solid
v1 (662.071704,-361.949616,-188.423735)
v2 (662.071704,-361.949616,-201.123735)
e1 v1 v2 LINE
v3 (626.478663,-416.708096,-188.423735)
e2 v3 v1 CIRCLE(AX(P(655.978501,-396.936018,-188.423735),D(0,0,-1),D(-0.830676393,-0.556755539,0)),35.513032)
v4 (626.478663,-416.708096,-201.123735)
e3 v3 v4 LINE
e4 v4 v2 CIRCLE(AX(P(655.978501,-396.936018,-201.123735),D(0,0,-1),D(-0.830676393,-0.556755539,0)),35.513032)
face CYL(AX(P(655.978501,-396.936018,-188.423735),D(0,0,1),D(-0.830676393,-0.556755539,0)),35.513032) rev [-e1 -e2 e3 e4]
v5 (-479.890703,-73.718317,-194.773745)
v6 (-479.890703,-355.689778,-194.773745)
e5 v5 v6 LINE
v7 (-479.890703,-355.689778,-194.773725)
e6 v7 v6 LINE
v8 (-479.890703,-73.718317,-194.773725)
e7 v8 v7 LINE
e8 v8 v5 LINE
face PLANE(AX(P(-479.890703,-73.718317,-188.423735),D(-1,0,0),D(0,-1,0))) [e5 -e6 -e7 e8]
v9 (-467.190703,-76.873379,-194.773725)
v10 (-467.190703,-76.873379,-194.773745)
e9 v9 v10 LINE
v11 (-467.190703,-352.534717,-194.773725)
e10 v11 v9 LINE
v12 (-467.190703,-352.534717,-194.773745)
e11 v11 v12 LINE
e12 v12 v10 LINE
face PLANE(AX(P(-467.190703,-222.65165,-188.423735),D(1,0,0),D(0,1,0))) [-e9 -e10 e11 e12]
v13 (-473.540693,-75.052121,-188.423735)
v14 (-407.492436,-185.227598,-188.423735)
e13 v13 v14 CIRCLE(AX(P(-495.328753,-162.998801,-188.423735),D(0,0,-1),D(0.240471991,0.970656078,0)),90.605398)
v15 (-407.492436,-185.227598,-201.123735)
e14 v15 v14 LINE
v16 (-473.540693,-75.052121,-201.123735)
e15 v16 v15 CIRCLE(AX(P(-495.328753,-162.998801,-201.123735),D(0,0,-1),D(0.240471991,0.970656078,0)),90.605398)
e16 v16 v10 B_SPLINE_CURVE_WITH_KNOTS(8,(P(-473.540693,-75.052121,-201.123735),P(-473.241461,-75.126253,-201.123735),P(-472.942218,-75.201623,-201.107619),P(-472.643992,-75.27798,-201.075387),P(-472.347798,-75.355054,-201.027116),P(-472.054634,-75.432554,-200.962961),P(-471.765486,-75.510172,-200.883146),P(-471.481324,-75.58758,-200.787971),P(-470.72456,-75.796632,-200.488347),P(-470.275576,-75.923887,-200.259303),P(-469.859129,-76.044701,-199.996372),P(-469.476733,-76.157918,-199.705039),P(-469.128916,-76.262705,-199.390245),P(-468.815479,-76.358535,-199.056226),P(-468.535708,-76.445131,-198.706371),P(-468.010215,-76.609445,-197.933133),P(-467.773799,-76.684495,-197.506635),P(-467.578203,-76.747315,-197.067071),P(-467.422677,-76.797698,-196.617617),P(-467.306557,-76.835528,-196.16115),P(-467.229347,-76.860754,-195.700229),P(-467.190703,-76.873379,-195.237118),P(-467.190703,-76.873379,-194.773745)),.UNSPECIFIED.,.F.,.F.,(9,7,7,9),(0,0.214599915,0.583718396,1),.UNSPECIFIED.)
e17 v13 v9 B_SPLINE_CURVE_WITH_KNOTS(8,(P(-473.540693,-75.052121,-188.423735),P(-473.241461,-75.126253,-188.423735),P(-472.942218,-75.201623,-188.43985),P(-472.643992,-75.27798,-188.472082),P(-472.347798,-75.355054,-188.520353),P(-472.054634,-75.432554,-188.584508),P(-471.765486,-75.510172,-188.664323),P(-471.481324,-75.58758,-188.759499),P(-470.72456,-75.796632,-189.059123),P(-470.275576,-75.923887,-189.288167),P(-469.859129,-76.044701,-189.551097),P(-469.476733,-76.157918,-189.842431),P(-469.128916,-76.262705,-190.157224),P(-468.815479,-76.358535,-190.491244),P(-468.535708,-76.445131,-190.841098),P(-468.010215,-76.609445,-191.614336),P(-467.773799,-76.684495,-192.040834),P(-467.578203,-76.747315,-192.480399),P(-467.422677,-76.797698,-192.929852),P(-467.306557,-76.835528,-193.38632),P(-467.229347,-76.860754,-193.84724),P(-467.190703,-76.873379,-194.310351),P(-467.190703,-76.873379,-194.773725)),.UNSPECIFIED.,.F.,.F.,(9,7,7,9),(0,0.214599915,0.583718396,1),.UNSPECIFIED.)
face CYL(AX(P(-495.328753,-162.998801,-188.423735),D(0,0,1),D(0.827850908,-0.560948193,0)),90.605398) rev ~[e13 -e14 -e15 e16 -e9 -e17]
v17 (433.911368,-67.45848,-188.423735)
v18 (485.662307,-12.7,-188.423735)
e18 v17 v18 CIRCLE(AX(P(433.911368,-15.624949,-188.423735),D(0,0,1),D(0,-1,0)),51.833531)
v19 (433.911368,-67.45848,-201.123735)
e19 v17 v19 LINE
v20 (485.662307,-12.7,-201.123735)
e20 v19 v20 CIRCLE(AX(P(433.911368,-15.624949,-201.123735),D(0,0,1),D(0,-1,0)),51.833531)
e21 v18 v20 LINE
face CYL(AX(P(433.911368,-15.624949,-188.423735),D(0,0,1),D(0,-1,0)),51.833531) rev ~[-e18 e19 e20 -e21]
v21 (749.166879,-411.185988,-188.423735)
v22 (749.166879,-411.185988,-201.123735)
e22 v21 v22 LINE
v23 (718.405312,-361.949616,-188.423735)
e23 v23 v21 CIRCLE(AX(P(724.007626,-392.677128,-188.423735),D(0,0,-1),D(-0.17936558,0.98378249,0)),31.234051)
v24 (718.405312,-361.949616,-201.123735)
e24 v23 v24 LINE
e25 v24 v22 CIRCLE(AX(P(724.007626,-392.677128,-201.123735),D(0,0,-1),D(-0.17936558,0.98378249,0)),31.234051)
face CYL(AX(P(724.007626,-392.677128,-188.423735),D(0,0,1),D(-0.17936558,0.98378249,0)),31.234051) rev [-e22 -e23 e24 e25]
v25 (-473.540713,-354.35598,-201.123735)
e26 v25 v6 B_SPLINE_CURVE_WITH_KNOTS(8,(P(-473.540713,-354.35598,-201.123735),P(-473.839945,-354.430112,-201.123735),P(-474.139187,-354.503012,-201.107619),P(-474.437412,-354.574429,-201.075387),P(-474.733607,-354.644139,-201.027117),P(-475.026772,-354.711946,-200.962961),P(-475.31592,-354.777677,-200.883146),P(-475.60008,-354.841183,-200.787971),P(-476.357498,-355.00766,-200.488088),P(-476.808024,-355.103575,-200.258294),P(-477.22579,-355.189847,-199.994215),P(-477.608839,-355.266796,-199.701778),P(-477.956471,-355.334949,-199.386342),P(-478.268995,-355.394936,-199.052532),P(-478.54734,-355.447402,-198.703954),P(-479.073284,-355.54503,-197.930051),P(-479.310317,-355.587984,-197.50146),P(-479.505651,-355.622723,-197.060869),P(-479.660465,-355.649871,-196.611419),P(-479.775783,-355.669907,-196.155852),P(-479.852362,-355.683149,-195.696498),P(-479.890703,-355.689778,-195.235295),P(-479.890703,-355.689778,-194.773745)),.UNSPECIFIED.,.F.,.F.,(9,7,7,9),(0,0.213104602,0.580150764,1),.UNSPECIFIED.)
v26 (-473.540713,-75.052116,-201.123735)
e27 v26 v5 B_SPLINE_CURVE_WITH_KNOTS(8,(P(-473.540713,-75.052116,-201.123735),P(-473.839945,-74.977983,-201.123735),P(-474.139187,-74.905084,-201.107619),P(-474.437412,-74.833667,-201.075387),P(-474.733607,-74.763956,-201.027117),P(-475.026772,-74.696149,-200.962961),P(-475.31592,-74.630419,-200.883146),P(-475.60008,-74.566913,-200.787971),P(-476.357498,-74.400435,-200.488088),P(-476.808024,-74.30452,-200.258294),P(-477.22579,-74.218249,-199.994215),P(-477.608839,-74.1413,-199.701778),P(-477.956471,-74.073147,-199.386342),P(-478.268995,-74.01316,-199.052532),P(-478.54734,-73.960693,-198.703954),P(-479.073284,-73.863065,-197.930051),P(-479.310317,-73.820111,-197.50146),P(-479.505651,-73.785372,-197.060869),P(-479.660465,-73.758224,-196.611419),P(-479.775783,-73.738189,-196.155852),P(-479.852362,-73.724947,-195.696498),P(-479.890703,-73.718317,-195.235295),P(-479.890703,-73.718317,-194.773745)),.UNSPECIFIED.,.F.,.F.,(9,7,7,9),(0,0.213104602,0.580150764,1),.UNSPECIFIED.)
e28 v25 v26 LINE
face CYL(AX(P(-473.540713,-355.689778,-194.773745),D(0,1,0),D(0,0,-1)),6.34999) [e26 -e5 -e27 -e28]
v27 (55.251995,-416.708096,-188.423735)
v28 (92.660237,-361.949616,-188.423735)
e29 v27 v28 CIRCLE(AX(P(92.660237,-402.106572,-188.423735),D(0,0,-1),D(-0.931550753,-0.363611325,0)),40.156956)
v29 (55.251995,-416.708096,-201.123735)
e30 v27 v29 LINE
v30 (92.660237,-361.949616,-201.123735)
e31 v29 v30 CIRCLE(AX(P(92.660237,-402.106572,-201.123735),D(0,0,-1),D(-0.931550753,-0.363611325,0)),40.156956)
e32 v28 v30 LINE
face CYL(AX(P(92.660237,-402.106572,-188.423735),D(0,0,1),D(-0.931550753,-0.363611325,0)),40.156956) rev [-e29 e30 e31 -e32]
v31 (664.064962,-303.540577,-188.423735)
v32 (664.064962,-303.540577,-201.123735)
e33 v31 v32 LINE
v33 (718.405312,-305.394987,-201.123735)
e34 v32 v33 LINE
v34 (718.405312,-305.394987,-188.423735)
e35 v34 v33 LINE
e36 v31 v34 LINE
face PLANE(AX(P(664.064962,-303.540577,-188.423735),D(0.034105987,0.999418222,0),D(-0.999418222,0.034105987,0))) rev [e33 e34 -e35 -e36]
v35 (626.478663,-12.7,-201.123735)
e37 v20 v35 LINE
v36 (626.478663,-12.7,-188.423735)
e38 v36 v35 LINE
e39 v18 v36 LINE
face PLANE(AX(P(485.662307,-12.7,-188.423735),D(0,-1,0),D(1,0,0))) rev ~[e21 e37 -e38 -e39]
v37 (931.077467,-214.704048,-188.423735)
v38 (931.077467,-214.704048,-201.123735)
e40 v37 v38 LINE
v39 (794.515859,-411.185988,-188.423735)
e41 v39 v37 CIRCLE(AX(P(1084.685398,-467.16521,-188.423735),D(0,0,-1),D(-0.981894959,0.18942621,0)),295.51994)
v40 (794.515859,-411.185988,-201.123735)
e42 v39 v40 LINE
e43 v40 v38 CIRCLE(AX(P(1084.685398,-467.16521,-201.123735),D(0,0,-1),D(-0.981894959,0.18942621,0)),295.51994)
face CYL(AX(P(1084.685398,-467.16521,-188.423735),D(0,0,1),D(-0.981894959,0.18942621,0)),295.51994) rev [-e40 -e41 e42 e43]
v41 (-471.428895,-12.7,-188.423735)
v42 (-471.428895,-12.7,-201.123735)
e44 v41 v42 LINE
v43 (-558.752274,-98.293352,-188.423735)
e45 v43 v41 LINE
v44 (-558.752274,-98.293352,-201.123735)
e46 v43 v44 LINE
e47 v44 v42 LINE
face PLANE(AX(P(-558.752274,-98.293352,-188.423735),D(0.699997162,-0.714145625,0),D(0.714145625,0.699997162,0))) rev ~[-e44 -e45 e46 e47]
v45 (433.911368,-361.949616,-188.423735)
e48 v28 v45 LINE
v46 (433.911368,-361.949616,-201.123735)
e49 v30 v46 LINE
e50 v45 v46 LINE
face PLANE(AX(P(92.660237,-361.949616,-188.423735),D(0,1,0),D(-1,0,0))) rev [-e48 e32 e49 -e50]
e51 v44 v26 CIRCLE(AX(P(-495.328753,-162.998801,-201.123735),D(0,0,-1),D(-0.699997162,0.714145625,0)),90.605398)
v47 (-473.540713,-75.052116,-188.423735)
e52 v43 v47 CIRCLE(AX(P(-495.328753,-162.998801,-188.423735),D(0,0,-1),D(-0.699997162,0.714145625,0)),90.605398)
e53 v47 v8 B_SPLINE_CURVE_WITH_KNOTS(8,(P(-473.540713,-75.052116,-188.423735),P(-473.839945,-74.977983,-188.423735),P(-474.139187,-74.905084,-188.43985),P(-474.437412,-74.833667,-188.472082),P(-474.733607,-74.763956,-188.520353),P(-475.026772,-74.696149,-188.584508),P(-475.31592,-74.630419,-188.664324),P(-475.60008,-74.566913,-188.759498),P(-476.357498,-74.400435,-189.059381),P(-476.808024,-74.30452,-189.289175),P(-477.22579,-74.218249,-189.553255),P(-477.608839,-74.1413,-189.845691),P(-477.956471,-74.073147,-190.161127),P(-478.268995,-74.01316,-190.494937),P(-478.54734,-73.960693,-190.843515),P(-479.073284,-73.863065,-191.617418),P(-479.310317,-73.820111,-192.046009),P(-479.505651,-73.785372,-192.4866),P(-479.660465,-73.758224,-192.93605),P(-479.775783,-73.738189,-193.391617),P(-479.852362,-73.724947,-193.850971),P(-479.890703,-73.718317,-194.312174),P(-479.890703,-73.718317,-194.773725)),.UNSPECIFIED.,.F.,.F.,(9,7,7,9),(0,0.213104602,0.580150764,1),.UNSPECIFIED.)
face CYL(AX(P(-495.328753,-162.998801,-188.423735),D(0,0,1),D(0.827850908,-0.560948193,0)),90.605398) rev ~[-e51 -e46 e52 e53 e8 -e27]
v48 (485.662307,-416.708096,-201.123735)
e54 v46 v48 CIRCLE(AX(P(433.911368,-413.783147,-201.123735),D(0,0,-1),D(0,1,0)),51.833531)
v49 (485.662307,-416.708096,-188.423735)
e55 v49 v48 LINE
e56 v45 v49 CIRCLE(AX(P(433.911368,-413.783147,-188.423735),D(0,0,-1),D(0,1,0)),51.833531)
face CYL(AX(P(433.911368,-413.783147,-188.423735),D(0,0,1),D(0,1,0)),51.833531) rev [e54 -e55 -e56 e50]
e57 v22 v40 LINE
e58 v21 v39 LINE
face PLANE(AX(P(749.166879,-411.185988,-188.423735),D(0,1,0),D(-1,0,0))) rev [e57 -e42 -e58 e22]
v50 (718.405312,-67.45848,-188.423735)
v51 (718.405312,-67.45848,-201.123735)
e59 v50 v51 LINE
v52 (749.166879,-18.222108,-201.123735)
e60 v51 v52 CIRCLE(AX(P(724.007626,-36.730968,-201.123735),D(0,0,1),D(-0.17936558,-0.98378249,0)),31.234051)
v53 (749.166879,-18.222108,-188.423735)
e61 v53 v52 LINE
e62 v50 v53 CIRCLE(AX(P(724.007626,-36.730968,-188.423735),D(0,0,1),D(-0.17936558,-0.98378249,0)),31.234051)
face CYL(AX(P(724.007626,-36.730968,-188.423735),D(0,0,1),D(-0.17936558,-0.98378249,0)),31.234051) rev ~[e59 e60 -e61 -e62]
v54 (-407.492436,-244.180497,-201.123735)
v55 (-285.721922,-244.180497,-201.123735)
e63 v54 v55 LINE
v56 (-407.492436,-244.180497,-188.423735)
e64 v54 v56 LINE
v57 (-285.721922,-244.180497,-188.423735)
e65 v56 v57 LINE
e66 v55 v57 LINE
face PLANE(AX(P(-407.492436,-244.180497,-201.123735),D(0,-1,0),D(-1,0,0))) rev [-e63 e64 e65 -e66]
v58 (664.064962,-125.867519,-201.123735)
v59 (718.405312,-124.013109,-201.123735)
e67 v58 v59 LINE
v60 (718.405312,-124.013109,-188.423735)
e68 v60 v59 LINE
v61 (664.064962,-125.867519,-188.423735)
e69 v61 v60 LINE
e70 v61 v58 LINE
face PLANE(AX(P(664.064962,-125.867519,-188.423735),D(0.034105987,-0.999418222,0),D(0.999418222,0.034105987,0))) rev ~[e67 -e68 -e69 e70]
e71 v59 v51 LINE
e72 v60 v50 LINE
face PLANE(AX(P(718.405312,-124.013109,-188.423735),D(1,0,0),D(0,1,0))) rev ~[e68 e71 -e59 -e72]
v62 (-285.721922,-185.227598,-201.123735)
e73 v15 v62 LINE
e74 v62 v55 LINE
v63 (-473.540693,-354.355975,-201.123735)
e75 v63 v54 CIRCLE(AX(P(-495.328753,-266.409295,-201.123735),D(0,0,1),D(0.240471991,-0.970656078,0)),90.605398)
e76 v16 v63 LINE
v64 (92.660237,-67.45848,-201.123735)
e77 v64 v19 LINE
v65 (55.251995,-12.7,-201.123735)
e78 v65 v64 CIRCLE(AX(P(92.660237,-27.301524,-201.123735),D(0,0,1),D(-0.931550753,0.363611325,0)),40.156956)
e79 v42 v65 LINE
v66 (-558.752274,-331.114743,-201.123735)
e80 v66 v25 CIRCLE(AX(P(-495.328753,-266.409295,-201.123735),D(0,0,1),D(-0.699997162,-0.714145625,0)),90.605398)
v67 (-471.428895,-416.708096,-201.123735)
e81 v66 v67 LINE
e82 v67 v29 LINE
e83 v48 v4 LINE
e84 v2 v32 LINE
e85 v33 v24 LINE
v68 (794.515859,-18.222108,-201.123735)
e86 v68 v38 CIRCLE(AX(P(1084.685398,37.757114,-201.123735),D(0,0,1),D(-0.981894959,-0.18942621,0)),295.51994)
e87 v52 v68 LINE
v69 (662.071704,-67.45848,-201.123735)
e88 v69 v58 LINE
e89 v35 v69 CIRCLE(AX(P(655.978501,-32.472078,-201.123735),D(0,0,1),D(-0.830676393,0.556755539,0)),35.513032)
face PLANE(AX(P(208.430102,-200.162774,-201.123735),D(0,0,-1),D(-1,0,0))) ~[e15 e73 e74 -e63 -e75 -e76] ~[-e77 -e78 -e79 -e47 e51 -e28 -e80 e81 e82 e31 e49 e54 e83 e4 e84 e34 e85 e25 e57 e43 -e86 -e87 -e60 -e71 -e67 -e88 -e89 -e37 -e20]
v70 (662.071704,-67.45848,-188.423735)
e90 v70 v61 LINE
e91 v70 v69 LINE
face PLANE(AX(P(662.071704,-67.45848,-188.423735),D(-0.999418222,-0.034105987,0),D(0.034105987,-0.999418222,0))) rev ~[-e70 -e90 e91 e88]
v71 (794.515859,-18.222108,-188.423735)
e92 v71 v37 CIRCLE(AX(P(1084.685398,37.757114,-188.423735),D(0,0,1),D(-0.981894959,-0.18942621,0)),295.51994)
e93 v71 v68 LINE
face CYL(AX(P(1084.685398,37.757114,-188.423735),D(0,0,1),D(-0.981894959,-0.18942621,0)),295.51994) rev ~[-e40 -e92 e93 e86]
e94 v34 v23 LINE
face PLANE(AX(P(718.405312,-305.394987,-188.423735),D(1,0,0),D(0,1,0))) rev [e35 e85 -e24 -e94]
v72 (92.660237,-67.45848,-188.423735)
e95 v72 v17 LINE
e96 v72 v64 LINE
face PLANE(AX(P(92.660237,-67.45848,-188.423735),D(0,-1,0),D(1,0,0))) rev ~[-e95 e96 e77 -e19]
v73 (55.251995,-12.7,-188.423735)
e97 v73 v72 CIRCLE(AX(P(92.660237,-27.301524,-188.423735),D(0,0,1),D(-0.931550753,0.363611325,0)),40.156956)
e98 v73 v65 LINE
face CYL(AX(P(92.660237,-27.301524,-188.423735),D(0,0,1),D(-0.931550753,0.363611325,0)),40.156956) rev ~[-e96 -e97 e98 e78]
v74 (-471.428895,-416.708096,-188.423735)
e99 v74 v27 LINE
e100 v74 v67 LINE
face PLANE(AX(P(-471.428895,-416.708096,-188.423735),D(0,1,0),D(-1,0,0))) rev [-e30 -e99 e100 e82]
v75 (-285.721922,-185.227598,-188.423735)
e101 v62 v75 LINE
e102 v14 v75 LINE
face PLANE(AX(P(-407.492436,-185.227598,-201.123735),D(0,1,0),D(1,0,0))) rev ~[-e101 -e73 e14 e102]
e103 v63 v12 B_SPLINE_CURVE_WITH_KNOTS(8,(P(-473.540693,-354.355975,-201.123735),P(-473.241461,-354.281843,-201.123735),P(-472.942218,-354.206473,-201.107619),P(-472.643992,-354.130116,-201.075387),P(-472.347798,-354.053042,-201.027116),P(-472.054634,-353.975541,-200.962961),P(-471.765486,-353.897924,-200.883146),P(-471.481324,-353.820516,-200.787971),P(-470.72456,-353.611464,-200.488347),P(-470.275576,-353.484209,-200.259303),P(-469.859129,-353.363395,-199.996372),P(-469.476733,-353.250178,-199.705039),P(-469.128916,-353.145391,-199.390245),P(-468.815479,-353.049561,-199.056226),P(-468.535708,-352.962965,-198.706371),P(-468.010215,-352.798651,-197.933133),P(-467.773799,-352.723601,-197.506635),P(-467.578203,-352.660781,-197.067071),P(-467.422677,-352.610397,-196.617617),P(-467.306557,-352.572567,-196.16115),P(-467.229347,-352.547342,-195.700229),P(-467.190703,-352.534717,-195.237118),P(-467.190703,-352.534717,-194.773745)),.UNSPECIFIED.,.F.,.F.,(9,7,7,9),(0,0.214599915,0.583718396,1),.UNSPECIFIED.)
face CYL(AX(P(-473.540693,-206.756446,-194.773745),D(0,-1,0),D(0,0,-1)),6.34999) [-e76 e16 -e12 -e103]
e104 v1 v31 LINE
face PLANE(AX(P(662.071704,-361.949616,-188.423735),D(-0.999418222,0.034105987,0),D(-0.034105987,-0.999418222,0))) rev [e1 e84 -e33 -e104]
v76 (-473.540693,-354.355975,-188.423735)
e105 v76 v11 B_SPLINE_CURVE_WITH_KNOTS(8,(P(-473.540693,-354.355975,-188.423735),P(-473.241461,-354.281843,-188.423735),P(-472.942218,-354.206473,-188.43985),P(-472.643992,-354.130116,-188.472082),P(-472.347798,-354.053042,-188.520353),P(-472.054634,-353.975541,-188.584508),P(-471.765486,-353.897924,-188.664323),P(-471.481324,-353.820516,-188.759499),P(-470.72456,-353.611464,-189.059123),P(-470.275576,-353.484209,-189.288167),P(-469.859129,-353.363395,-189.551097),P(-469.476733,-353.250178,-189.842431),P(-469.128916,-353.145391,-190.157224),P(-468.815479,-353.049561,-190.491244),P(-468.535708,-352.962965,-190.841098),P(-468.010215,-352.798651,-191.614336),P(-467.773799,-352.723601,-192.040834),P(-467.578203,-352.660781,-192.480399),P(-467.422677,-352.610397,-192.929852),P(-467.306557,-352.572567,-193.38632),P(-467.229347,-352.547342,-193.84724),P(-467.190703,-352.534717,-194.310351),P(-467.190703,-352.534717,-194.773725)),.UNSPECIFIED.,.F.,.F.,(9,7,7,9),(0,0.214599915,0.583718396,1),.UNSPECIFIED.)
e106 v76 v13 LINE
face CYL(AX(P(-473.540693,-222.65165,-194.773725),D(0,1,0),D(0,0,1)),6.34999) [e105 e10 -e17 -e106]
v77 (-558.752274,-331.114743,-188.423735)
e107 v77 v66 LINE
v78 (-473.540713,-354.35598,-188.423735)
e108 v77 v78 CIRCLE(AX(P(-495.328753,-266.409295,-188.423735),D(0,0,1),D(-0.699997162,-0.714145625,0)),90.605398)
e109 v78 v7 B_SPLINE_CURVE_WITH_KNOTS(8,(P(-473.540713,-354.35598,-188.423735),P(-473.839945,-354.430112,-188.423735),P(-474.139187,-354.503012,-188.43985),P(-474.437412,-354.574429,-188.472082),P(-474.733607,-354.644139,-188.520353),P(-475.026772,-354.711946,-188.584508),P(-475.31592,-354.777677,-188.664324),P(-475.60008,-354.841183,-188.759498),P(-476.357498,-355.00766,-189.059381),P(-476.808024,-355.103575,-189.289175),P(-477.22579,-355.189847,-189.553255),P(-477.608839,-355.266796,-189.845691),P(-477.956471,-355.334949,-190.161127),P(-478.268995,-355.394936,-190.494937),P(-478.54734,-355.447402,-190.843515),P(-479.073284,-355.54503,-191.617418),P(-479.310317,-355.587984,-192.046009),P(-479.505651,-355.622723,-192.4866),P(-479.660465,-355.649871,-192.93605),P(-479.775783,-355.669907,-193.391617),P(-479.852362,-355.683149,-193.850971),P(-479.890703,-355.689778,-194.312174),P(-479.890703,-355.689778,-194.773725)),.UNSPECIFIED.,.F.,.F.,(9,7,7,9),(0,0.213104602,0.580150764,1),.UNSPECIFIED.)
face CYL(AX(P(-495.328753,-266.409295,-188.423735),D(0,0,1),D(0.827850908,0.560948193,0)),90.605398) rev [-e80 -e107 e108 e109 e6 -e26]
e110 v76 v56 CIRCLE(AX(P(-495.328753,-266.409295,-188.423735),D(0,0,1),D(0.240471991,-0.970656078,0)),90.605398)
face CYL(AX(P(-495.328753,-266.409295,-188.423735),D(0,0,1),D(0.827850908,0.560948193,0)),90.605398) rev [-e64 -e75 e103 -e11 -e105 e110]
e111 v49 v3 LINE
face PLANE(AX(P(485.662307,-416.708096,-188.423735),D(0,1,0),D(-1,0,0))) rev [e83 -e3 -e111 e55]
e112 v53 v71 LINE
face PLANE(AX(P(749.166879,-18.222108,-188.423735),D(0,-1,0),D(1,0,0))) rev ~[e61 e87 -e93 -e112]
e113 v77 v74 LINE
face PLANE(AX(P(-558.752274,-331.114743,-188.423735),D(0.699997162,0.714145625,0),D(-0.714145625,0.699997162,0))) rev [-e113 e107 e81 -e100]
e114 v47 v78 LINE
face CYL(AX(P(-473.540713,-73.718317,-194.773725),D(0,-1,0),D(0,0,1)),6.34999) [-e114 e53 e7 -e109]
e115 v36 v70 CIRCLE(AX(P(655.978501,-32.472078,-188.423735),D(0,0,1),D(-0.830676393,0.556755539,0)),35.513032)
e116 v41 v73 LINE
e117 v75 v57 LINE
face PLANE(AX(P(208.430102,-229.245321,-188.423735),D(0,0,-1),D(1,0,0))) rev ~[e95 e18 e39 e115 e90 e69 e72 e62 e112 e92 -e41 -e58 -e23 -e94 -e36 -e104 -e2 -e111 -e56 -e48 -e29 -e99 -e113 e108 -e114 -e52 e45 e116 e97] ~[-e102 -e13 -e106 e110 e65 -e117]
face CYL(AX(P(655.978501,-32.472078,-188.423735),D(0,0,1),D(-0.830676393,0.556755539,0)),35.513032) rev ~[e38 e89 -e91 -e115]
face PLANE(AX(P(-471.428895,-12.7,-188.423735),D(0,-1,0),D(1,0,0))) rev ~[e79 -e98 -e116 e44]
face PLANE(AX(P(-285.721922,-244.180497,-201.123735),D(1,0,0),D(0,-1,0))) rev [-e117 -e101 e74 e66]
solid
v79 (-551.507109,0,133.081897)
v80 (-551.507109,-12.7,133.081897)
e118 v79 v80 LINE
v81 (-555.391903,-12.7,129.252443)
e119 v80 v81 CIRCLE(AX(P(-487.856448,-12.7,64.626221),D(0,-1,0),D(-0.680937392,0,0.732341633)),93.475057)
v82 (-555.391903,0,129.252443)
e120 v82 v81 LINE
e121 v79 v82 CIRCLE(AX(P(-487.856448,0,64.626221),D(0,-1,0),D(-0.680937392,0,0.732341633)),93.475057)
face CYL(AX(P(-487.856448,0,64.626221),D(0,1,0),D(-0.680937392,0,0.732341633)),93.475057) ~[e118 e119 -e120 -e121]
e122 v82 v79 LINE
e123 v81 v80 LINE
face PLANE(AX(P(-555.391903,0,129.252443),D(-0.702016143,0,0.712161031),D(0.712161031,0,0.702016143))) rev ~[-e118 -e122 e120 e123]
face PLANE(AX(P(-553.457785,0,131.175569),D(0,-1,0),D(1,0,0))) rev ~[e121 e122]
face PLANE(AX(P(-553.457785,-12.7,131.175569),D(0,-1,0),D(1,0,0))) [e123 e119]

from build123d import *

# Parameters (mm, degrees)
F1_DEPTH = 12.7
F3_DEPTH = 25.4
F4_ANGLE = -90
F6_DEPTH = 12.7
F7_R     = 6.34999
F9_DEPTH = 25.4


# Not quite as in the source:
# - a fillet or chamfer is up to 0.001 mm smaller than in the source, because OpenCascade refuses the exact size


with BuildPart() as f1:
    # F0 (on Front) → F1 (new body)
    with BuildSketch(Plane.XZ):
        with BuildLine():
            ThreePointArc((-551.5071092971, 133.0818972722), (-553.4774467821, 131.195514327), (-555.3919033624, 129.2524429377))
            Line((-555.3919033624, 129.2524429377), (-551.5071092971, 133.0818972722))
        make_face()
    extrude(amount=F1_DEPTH)


with BuildPart() as f1b:
    # F0 (on Front) → F1, piece 2 (new body)
    with BuildSketch(Plane.XZ):
        with BuildLine():
            Line((-453.7474366549, 229.4489622575), (-551.5071092971, 133.0818972722))
            ThreePointArc((-551.5071092971, 133.0818972722), (-421.2871550244, 130.2472203685), (-420.3209924027, 0))
            ThreePointArc((-420.3209924027, 0), (-437.2739000343, -120.3876548814), (-558.7522743609, -115.5303823993))
            Line((-558.7522743609, -115.5303823993), (-471.4288946656, -201.1237346153))
            Line((-471.4288946656, -201.1237346153), (55.251994791, -201.1237346153))
            ThreePointArc((55.251994791, -201.1237346153), (59.5020266904, -163.8701869369), (92.6602373357, -146.3652547012))
            Line((92.6602373357, -146.3652547012), (433.9113681994, -146.3652547012))
            ThreePointArc((433.9113681994, -146.3652547012), (471.5831439124, -162.596085617), (485.6623065385, -201.1237346153))
            Line((485.6623065385, -201.1237346153), (626.4786631969, -201.1237346153))
            ThreePointArc((626.4786631969, -201.1237346153), (626.2028327697, -161.9974569275), (662.0717042558, -146.3652547012))
            Line((662.0717042558, -146.3652547012), (664.0649618373, -87.9562156213))
            Line((664.0649618373, -87.9562156213), (718.4053118981, -89.8106257683))
            Line((718.4053118981, -89.8106257683), (718.4053118981, -146.3652547012))
            ThreePointArc((718.4053118981, -146.3652547012), (750.4967470004, -160.5430728915), (749.1668792481, -195.6016265885))
            Line((749.1668792481, -195.6016265885), (794.5158585675, -195.6016265885))
            ThreePointArc((794.5158585675, -195.6016265885), (855.3282500186, -65.2281359399), (970.4922497392, 20.9846658139))
            Line((970.4922497392, 20.9846658139), (1027.914232903, 45.041990274))
            Line((1027.914232903, 45.041990274), (970.3385240831, 64.0667292165))
            ThreePointArc((970.3385240831, 64.0667292165), (860.0446545539, 126.9892643459), (785.0380322682, 229.4489622575))
            Line((785.0380322682, 229.4489622575), (736.1340486713, 229.4489622575))
            ThreePointArc((736.1340486713, 229.4489622575), (741.0762182682, 198.5184113591), (715.5427964992, 180.3754129308))
            Line((715.5427964992, 180.3754129308), (715.5427964992, 124.8339117276))
            Line((715.5427964992, 124.8339117276), (664.0649618373, 124.8339117276))
            Line((664.0649618373, 124.8339117276), (664.0649618373, 180.3754129308))
            ThreePointArc((664.0649618373, 180.3754129308), (638.4145031933, 198.2409293595), (640.1981479333, 229.4489622575))
            Line((640.1981479333, 229.4489622575), (469.6364638671, 229.4489622575))
            ThreePointArc((469.6364638671, 229.4489622575), (456.2733947157, 194.8460388869), (422.1188209756, 180.3754129308))
            Line((422.1188209756, 180.3754129308), (92.6602373357, 180.3754129308))
            ThreePointArc((92.6602373357, 180.3754129308), (61.501921171, 195.5559509867), (54.2525633451, 229.4489622575))
            Line((54.2525633451, 229.4489622575), (-453.7474366549, 229.4489622575))
        make_face()
    extrude(amount=F1_DEPTH)

    # F2 (on face) → F3 (cut)
    with BuildSketch(Plane.XZ.offset(12.7)):
        with BuildLine():
            Line((-285.7219224498, 30.356762849), (-400.8898424865, 30.356762849))
            ThreePointArc((-400.8898424865, 30.356762849), (-409.1284035376, 14.232955234), (-420.3209924027, 0))
            ThreePointArc((-420.3209924027, 0), (-412.6608440211, -13.7391565158), (-407.4924357678, -28.5961363948))
            Line((-407.4924357678, -28.5961363948), (-285.7219224498, -28.5961363948))
            Line((-285.7219224498, -28.5961363948), (-285.7219224498, 30.356762849))
        make_face()
    extrude(amount=-F3_DEPTH, mode=Mode.SUBTRACT)


with BuildPart() as f1b_1:
    # F4: moved
    add(f1b.part.rotate(Axis((-208.0884499373, -12.7, -201.1237346153), (-1, 0, 0)), F4_ANGLE))

    # F5 (on face) → F6 (join)
    with BuildSketch(Plane.XY.offset(-188.4237346153)):
        with BuildLine():
            ThreePointArc((-467.190702687, -76.8733791477), (-473.483667963, -75.0662676156), (-479.890702687, -73.7183172825))
            Line((-479.890702687, -73.7183172825), (-479.890702687, -222.6516499079))
            Line((-479.890702687, -222.6516499079), (-467.190702687, -222.6516499079))
            Line((-467.190702687, -222.6516499079), (-467.190702687, -76.8733791477))
        make_face()
    extrude(amount=-F6_DEPTH)

    # F7 (radius 6.35 in the source; OpenCascade refuses exactly that, so slightly less here)
    f7_edges = [f1b_1.edges().sort_by_distance(p)[0] for p in [
        (-467.190703, -149.762515, -201.123735),
        (-467.190703, -149.762515, -188.423735),
        (-479.890703, -148.184984, -188.423735),
        (-479.890703, -148.184984, -201.123735),
    ]]
    fillet(f7_edges, radius=F7_R)

    # F8 (on face) → F9 (cut)
    with BuildSketch(Plane.XY.offset(-188.4237346153)):
        with BuildLine():
            Line((931.0774667122, -214.7040478424), (-285.7219224498, -214.7040478424))
            Line((-285.7219224498, -214.7040478424), (-285.7219224498, -244.1804974643))
            Line((-285.7219224498, -244.1804974643), (-400.8898424865, -244.1804974643))
            ThreePointArc((-400.8898424865, -244.1804974643), (-435.1874662946, -355.6740755463), (-551.5071092971, -346.9056318875))
            Line((-551.5071092971, -346.9056318875), (-453.7474366549, -443.2726968728))
            Line((-453.7474366549, -443.2726968728), (54.2525633451, -443.2726968728))
            ThreePointArc((54.2525633451, -443.2726968728), (61.501921171, -409.379685602), (92.6602373357, -394.1991475461))
            Line((92.6602373357, -394.1991475461), (422.1188209756, -394.1991475461))
            ThreePointArc((422.1188209756, -394.1991475461), (456.2733947157, -408.6697735022), (469.6364638671, -443.2726968728))
            Line((469.6364638671, -443.2726968728), (640.1981479333, -443.2726968728))
            ThreePointArc((640.1981479333, -443.2726968728), (638.4145031933, -412.0646639748), (664.0649618373, -394.1991475461))
            Line((664.0649618373, -394.1991475461), (664.0649618373, -338.6576463429))
            Line((664.0649618373, -338.6576463429), (715.5427964992, -338.6576463429))
            Line((715.5427964992, -338.6576463429), (715.5427964992, -394.1991475461))
            ThreePointArc((715.5427964992, -394.1991475461), (741.0762182682, -412.3421459744), (736.1340486713, -443.2726968728))
            Line((736.1340486713, -443.2726968728), (785.0380322682, -443.2726968728))
            ThreePointArc((785.0380322682, -443.2726968728), (860.0446545539, -340.8129989612), (970.3385240831, -277.8904638318))
            Line((970.3385240831, -277.8904638318), (1027.914232903, -258.8657248893))
            Line((1027.914232903, -258.8657248893), (970.4922497392, -234.8084004292))
            ThreePointArc((970.4922497392, -234.8084004292), (950.408070054, -225.4949210906), (931.0774667122, -214.7040478424))
        make_face()
    extrude(amount=-F9_DEPTH, mode=Mode.SUBTRACT)

    # F10: F1b across face


with BuildPart() as f1b_2:
    add(f1b_1.part)
    add(f1b_1.part.mirror(Plane(origin=(322.6777721312, -214.7040478424, -194.7737346153), x_dir=(1, 0, 0), z_dir=(0, -1, 0))))


solid = Compound([f1.part, f1b_2.part])
